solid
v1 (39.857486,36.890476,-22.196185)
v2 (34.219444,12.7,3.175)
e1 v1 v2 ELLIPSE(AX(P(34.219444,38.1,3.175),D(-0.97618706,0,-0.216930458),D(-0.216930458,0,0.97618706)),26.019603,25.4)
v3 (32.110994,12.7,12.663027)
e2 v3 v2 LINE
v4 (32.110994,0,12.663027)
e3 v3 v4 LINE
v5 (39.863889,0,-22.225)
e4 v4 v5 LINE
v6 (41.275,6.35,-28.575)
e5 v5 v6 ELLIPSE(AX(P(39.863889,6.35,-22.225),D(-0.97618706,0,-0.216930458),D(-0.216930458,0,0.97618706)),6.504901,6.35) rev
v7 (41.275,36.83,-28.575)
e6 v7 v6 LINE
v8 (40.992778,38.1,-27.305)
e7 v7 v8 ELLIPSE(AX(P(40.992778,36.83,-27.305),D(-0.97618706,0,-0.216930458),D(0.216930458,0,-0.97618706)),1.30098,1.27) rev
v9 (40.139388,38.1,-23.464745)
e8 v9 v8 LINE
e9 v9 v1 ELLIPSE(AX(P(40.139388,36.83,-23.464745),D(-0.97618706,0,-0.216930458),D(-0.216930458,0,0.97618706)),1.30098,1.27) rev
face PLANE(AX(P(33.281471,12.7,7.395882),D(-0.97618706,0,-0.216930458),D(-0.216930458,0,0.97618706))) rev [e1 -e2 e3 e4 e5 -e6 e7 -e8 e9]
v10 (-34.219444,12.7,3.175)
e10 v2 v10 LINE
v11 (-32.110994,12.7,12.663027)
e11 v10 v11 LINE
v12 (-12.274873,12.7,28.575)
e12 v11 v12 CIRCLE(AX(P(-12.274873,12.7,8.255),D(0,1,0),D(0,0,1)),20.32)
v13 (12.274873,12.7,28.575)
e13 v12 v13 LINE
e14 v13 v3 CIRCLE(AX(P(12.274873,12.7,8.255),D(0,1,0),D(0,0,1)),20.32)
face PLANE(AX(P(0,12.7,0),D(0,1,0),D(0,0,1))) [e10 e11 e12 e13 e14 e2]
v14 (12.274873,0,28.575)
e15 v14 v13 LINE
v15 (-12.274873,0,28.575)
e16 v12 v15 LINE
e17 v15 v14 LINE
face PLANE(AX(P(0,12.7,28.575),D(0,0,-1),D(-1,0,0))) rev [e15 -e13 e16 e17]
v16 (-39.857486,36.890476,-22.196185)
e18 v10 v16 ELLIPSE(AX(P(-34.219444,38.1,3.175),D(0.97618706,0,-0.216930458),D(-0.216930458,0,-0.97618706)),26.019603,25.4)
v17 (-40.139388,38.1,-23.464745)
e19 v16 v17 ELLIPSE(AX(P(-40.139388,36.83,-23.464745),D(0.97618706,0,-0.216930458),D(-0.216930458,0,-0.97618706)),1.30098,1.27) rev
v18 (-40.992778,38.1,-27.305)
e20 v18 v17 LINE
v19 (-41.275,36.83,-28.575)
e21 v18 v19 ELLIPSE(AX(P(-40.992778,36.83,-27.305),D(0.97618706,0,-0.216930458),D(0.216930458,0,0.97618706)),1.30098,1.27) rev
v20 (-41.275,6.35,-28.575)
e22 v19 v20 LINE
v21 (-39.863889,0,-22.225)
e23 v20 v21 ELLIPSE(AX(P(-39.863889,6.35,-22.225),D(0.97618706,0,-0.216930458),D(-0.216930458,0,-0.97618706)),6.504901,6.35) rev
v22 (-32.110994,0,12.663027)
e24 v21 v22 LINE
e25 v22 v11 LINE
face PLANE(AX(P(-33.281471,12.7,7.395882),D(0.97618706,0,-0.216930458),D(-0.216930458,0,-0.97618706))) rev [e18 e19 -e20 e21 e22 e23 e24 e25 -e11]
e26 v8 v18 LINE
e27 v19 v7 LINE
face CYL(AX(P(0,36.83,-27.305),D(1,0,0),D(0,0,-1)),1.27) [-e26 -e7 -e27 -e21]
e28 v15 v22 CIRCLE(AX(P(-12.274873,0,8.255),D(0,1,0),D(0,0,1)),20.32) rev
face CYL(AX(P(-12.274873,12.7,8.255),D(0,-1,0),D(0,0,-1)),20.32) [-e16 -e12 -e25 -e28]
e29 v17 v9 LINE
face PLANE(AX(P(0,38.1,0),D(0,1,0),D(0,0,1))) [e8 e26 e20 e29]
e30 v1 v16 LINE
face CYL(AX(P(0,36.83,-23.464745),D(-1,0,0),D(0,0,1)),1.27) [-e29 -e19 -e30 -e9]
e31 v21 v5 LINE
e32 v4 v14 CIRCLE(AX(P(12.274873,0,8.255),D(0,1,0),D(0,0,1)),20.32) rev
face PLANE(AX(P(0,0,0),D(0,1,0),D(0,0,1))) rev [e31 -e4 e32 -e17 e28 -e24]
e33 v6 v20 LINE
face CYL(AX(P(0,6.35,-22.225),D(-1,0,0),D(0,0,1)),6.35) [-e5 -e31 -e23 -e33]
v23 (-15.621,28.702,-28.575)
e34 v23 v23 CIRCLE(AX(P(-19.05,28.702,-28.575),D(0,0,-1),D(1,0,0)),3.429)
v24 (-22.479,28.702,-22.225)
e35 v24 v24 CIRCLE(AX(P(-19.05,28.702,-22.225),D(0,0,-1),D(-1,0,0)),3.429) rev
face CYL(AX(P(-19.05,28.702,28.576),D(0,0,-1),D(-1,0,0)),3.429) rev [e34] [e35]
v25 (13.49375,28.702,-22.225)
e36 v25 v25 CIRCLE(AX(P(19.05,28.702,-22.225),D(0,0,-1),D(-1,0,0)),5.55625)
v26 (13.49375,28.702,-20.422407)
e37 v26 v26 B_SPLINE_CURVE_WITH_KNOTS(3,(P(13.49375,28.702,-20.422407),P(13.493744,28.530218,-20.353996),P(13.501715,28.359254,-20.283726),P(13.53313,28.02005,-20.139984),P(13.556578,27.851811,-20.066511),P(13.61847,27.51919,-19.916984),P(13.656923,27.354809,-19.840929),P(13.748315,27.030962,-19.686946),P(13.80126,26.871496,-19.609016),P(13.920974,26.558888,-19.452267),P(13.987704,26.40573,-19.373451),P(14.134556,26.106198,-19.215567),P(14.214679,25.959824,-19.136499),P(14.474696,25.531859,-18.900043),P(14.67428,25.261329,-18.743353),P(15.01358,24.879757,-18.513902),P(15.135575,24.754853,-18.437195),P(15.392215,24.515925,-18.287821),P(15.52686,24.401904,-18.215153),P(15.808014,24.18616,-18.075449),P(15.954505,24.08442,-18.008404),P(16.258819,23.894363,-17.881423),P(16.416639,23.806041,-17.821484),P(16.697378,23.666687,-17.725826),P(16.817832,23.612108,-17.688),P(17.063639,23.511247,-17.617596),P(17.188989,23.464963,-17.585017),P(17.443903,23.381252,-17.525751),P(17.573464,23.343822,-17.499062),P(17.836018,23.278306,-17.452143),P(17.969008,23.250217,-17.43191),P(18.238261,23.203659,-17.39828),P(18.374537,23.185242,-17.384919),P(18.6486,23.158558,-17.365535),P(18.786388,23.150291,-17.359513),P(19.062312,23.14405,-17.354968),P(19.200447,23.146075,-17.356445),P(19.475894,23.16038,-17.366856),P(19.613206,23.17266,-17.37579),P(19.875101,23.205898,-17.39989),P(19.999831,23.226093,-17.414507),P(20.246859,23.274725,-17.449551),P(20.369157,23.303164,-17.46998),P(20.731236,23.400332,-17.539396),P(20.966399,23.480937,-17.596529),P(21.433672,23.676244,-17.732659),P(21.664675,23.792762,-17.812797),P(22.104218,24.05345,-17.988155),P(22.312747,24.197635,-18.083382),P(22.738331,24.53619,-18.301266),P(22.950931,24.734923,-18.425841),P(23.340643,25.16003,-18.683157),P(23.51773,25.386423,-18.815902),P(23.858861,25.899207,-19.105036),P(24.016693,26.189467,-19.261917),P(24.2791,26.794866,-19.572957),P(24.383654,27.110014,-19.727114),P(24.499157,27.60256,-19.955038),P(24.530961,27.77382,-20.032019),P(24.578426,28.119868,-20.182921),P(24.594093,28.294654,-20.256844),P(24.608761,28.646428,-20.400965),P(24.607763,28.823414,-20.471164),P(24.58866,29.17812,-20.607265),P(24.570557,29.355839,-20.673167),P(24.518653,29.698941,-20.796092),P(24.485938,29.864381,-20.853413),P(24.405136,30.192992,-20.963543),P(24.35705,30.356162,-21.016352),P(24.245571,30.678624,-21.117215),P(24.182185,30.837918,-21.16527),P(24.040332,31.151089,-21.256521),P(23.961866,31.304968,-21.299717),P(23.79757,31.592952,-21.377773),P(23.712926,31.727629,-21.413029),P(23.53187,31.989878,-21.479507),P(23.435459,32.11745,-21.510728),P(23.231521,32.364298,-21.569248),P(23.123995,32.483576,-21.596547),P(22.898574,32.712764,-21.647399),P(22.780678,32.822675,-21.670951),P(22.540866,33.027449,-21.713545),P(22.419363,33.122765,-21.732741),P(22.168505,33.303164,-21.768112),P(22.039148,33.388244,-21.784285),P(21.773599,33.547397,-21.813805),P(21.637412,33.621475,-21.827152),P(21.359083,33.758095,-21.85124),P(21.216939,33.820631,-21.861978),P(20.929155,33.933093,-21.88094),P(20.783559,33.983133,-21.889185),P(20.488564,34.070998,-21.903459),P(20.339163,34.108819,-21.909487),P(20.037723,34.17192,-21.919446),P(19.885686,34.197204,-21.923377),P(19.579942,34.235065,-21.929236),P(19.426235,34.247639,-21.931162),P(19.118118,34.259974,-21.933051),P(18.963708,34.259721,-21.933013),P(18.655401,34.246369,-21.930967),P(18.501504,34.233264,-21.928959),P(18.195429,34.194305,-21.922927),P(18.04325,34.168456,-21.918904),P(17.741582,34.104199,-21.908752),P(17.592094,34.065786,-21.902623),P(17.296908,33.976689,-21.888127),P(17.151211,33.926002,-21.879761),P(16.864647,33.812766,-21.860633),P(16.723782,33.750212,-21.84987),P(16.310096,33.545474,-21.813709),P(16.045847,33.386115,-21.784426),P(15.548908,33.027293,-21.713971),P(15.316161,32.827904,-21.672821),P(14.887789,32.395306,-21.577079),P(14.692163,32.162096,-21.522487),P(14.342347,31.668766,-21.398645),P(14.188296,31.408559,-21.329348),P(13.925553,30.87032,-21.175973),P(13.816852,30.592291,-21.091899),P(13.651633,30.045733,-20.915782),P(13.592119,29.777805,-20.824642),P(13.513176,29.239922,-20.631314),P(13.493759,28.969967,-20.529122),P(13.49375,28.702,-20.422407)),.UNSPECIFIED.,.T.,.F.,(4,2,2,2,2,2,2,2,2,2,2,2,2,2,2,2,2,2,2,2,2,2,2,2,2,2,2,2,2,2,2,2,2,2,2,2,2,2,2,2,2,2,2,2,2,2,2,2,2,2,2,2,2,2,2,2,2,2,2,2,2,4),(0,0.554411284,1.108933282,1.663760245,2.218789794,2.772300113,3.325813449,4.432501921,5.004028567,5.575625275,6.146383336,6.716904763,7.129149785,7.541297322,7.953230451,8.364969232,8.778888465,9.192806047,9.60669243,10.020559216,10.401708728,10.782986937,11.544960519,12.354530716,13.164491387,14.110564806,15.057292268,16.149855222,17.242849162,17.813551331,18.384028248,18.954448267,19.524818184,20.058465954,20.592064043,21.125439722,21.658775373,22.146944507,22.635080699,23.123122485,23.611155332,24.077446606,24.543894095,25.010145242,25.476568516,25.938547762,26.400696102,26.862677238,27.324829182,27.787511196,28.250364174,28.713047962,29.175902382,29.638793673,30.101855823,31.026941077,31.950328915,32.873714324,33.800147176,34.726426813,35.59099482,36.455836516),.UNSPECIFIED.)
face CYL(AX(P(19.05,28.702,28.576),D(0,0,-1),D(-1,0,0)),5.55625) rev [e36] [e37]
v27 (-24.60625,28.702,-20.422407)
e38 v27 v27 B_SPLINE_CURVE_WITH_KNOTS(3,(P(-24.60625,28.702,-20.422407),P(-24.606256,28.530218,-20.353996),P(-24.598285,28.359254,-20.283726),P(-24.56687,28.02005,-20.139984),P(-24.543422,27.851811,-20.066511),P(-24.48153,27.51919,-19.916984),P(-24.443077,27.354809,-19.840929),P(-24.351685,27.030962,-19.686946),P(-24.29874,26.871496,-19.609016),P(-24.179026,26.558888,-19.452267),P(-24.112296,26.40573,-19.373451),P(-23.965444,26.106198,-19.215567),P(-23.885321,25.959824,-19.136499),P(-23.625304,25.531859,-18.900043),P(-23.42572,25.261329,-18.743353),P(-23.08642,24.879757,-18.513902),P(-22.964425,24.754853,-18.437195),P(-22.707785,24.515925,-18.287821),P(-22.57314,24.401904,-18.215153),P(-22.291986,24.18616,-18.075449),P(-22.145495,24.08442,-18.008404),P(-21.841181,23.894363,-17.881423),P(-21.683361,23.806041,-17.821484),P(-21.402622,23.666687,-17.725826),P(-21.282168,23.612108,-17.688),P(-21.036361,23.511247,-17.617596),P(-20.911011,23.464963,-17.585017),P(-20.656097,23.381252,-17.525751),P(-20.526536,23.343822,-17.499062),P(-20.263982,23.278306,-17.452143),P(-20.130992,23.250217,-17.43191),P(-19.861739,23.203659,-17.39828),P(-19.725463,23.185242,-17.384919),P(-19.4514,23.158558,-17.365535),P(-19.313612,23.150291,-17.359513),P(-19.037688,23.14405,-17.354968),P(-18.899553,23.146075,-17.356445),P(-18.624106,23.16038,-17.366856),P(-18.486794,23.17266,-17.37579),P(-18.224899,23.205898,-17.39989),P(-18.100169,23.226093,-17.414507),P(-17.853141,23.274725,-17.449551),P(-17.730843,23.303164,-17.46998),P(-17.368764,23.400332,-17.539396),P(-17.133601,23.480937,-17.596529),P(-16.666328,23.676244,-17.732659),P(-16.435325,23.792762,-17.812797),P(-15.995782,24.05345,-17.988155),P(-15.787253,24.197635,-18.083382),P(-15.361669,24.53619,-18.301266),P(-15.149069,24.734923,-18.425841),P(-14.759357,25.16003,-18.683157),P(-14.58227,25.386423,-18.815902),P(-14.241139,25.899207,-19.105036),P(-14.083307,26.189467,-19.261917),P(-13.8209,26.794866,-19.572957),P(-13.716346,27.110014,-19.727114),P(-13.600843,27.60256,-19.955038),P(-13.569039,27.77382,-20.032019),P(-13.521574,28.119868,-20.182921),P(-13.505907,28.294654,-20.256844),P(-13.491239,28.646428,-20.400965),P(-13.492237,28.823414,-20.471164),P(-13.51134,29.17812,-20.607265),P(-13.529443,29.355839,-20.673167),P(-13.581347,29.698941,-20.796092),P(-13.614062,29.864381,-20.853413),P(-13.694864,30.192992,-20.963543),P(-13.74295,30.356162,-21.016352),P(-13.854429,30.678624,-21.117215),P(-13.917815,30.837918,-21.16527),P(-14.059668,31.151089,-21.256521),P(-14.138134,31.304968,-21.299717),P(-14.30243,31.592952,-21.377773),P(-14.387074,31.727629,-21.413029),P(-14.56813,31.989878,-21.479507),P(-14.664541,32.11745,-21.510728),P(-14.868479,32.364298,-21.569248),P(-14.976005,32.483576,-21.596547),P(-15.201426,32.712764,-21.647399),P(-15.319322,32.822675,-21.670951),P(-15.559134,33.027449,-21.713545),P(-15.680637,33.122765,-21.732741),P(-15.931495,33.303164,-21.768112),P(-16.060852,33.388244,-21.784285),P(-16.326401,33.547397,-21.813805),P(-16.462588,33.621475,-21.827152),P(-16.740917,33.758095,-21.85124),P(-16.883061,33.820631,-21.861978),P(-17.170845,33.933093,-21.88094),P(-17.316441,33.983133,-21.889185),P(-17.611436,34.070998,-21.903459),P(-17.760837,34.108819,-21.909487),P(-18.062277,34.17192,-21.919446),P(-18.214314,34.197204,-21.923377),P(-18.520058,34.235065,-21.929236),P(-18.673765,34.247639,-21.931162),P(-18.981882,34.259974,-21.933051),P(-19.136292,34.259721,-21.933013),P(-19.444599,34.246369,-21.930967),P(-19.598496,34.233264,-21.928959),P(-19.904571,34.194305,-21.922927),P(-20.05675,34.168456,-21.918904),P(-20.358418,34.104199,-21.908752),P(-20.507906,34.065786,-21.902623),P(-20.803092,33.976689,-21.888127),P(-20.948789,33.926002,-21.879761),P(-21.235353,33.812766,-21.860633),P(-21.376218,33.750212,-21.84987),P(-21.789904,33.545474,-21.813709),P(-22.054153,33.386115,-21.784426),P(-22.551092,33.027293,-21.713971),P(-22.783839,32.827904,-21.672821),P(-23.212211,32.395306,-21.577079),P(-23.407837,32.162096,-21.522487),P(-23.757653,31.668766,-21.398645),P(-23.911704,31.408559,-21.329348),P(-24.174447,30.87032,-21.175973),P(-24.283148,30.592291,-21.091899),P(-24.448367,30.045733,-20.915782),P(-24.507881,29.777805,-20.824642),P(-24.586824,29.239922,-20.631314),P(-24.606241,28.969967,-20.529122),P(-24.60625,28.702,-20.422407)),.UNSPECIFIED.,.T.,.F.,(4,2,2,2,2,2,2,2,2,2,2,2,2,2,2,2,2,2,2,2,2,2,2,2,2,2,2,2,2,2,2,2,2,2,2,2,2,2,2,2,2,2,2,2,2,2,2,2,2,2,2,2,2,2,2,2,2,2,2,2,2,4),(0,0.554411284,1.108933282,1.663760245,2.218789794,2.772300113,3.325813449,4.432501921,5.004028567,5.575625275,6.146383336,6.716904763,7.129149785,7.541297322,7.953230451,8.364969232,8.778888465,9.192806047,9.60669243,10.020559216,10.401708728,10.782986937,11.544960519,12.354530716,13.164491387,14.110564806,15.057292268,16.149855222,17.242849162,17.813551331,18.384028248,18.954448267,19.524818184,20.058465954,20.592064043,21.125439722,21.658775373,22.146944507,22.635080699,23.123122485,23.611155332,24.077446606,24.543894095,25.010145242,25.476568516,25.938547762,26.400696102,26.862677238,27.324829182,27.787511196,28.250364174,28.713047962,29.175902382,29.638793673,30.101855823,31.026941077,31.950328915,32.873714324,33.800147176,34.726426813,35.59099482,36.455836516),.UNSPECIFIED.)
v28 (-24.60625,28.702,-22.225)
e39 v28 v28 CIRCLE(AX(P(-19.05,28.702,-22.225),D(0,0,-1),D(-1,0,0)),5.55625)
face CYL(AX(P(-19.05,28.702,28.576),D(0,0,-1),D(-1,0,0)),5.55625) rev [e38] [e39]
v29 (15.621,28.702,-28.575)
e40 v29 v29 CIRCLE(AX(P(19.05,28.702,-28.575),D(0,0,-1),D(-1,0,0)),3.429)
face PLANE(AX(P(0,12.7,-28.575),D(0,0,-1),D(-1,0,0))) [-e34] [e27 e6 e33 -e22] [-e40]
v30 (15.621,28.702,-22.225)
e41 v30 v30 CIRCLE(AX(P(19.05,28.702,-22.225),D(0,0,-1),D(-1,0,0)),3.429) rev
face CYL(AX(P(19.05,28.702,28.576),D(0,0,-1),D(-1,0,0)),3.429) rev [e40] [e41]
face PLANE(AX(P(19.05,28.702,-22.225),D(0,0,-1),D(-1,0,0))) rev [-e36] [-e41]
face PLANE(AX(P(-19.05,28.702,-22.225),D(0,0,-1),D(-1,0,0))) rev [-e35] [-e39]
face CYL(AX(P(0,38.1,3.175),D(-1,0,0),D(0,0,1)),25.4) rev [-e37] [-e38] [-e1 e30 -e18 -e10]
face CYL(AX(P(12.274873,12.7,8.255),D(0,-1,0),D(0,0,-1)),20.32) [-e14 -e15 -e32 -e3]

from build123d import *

# Parameters (mm, degrees)
BOSS_EXTRUDE1_DEPTH     = 12.7
BOSS_EXTRUDE2_DEPTH     = 38.1
FILLET1_R               = 25.4
FILLET2_R               = 20.32
FILLET3_R               = 6.35
FILLET4_R               = 1.2699999999999994
CUT_EXTRUDE5_REACH      = 82.133
CUT_EXTRUDE5_END_RADIUS = 25.400000000000002
SKETCH6_R               = 3.4289999999999985
CUT_EXTRUDE6_REACH      = 77.736
CUT_EXTRUDE6_END_RADIUS = 25.400000000000002
SKETCH7_R               = 5.55625
SKETCH7_R_2             = 5.556250000000004


with BuildPart() as part:
    # Sketch1 → Boss-Extrude1 (new body)
    with BuildSketch(Plane(origin=(0, 0, 0), x_dir=(1, 0, 0), z_dir=(0, 1, 0))):
        Polygon((39.86388888888888, 22.225000000000012), (-39.86388888888888, 22.225), (-28.574999999999996, -28.57499999999998), (28.575000000000006, -28.574999999999978), align=None)
        Polygon((41.27499999999999, 28.575000000000014), (-41.275000000000006, 28.575000000000003), (-39.863888888888894, 22.225), (39.86388888888888, 22.225000000000012), align=None)
    extrude(amount=BOSS_EXTRUDE1_DEPTH)

    # Sketch1<5> → Boss-Extrude2 (add)
    with BuildSketch(Plane(origin=(0, 0, 0), x_dir=(1, 0, 0), z_dir=(0, 1, 0))):
        Polygon((41.27499999999999, 28.575000000000014), (-41.275000000000006, 28.575000000000003), (-39.863888888888894, 22.225), (39.86388888888888, 22.225000000000012), align=None)
    extrude(amount=BOSS_EXTRUDE2_DEPTH)

    # Fillet1
    fillet1_edges = [part.edges().sort_by_distance(p)[0] for p in [
        (0, 12.7, -22.22500000000001),
    ]]
    fillet(fillet1_edges, radius=FILLET1_R - 0.0001)  # a hair under: the kernel refuses the full size

    # Fillet2
    fillet2_edges = [part.edges().sort_by_distance(p)[0] for p in [
        (28.575000000000006, 6.35, 28.574999999999978),
        (-28.574999999999996, 6.35, 28.57499999999998),
    ]]
    fillet(fillet2_edges, radius=FILLET2_R)

    # Fillet3
    fillet3_edges = [part.edges().sort_by_distance(p)[0] for p in [
        (-7.11e-15, 0, -28.57500000000001),
    ]]
    fillet(fillet3_edges, radius=FILLET3_R)

    # Fillet4
    fillet4_edges = [part.edges().sort_by_distance(p)[0] for p in [
        (0, 38.1, -22.22500000000001),
        (-7.11e-15, 38.1, -28.57500000000001),
    ]]
    fillet(fillet4_edges, radius=FILLET4_R)

    # Cut-Extrude5: up to this cylinder (the profile starts outside it)
    cut_extrude5_end = Plane(origin=(3.97e-15, 38.1, 3.1749999999999905), z_dir=(-1, 0, 1.3e-16)) * Cylinder(CUT_EXTRUDE5_END_RADIUS, 254.166, mode=Mode.PRIVATE)
    # Sketch6 → Cut-Extrude5 (cut, up to the surface)
    with BuildSketch(Plane(origin=(-3.6e-15, 0, -28.57500000000001), x_dir=(-1, 0, 1.3e-16), z_dir=(-1.3e-16, 0, -1)), mode=Mode.PRIVATE) as cut_extrude5_sk1:
        with Locations((-19.05, 28.701999999999998)):
            Circle(SKETCH6_R)
    cut_extrude5_tool1 = extrude(cut_extrude5_sk1.sketch, amount=-CUT_EXTRUDE5_REACH, mode=Mode.PRIVATE) - cut_extrude5_end
    add(cut_extrude5_tool1.solids().sort_by_distance((19.05, 28.702, -28.575))[0], mode=Mode.SUBTRACT)
    # Sketch6 → Cut-Extrude5 (cut, up to the surface)
    with BuildSketch(Plane(origin=(-3.6e-15, 0, -28.57500000000001), x_dir=(-1, 0, 1.3e-16), z_dir=(-1.3e-16, 0, -1)), mode=Mode.PRIVATE) as cut_extrude5_sk2:
        with Locations((19.05, 28.701999999999998)):
            Circle(SKETCH6_R)
    cut_extrude5_tool2 = extrude(cut_extrude5_sk2.sketch, amount=-CUT_EXTRUDE5_REACH, mode=Mode.PRIVATE) - cut_extrude5_end
    add(cut_extrude5_tool2.solids().sort_by_distance((-19.05, 28.702, -28.575))[0], mode=Mode.SUBTRACT)

    # Cut-Extrude6: up to this cylinder (the profile starts outside it)
    cut_extrude6_end = Plane(origin=(3.97e-15, 38.1, 3.1749999999999905), z_dir=(-1, 0, 1.3e-16)) * Cylinder(CUT_EXTRUDE6_END_RADIUS, 245.372, mode=Mode.PRIVATE)
    # Sketch7 → Cut-Extrude6 (cut, up to the surface)
    with BuildSketch(Plane(origin=(-2.8e-15, 0, -22.22500000000001), x_dir=(-1, 0, 1.3e-16), z_dir=(-1.3e-16, 0, -1)), mode=Mode.PRIVATE) as cut_extrude6_sk1:
        with Locations((-19.05, 28.701999999999998)):
            Circle(SKETCH7_R)
    cut_extrude6_tool1 = extrude(cut_extrude6_sk1.sketch, amount=-CUT_EXTRUDE6_REACH, mode=Mode.PRIVATE) - cut_extrude6_end
    add(cut_extrude6_tool1.solids().sort_by_distance((19.05, 28.702, -22.225))[0], mode=Mode.SUBTRACT)
    # Sketch7 → Cut-Extrude6 (cut, up to the surface)
    with BuildSketch(Plane(origin=(-2.8e-15, 0, -22.22500000000001), x_dir=(-1, 0, 1.3e-16), z_dir=(-1.3e-16, 0, -1)), mode=Mode.PRIVATE) as cut_extrude6_sk2:
        with Locations((19.05, 28.701999999999998)):
            Circle(SKETCH7_R_2)
    cut_extrude6_tool2 = extrude(cut_extrude6_sk2.sketch, amount=-CUT_EXTRUDE6_REACH, mode=Mode.PRIVATE) - cut_extrude6_end
    add(cut_extrude6_tool2.solids().sort_by_distance((-19.05, 28.702, -22.225))[0], mode=Mode.SUBTRACT)


solid = part.part
